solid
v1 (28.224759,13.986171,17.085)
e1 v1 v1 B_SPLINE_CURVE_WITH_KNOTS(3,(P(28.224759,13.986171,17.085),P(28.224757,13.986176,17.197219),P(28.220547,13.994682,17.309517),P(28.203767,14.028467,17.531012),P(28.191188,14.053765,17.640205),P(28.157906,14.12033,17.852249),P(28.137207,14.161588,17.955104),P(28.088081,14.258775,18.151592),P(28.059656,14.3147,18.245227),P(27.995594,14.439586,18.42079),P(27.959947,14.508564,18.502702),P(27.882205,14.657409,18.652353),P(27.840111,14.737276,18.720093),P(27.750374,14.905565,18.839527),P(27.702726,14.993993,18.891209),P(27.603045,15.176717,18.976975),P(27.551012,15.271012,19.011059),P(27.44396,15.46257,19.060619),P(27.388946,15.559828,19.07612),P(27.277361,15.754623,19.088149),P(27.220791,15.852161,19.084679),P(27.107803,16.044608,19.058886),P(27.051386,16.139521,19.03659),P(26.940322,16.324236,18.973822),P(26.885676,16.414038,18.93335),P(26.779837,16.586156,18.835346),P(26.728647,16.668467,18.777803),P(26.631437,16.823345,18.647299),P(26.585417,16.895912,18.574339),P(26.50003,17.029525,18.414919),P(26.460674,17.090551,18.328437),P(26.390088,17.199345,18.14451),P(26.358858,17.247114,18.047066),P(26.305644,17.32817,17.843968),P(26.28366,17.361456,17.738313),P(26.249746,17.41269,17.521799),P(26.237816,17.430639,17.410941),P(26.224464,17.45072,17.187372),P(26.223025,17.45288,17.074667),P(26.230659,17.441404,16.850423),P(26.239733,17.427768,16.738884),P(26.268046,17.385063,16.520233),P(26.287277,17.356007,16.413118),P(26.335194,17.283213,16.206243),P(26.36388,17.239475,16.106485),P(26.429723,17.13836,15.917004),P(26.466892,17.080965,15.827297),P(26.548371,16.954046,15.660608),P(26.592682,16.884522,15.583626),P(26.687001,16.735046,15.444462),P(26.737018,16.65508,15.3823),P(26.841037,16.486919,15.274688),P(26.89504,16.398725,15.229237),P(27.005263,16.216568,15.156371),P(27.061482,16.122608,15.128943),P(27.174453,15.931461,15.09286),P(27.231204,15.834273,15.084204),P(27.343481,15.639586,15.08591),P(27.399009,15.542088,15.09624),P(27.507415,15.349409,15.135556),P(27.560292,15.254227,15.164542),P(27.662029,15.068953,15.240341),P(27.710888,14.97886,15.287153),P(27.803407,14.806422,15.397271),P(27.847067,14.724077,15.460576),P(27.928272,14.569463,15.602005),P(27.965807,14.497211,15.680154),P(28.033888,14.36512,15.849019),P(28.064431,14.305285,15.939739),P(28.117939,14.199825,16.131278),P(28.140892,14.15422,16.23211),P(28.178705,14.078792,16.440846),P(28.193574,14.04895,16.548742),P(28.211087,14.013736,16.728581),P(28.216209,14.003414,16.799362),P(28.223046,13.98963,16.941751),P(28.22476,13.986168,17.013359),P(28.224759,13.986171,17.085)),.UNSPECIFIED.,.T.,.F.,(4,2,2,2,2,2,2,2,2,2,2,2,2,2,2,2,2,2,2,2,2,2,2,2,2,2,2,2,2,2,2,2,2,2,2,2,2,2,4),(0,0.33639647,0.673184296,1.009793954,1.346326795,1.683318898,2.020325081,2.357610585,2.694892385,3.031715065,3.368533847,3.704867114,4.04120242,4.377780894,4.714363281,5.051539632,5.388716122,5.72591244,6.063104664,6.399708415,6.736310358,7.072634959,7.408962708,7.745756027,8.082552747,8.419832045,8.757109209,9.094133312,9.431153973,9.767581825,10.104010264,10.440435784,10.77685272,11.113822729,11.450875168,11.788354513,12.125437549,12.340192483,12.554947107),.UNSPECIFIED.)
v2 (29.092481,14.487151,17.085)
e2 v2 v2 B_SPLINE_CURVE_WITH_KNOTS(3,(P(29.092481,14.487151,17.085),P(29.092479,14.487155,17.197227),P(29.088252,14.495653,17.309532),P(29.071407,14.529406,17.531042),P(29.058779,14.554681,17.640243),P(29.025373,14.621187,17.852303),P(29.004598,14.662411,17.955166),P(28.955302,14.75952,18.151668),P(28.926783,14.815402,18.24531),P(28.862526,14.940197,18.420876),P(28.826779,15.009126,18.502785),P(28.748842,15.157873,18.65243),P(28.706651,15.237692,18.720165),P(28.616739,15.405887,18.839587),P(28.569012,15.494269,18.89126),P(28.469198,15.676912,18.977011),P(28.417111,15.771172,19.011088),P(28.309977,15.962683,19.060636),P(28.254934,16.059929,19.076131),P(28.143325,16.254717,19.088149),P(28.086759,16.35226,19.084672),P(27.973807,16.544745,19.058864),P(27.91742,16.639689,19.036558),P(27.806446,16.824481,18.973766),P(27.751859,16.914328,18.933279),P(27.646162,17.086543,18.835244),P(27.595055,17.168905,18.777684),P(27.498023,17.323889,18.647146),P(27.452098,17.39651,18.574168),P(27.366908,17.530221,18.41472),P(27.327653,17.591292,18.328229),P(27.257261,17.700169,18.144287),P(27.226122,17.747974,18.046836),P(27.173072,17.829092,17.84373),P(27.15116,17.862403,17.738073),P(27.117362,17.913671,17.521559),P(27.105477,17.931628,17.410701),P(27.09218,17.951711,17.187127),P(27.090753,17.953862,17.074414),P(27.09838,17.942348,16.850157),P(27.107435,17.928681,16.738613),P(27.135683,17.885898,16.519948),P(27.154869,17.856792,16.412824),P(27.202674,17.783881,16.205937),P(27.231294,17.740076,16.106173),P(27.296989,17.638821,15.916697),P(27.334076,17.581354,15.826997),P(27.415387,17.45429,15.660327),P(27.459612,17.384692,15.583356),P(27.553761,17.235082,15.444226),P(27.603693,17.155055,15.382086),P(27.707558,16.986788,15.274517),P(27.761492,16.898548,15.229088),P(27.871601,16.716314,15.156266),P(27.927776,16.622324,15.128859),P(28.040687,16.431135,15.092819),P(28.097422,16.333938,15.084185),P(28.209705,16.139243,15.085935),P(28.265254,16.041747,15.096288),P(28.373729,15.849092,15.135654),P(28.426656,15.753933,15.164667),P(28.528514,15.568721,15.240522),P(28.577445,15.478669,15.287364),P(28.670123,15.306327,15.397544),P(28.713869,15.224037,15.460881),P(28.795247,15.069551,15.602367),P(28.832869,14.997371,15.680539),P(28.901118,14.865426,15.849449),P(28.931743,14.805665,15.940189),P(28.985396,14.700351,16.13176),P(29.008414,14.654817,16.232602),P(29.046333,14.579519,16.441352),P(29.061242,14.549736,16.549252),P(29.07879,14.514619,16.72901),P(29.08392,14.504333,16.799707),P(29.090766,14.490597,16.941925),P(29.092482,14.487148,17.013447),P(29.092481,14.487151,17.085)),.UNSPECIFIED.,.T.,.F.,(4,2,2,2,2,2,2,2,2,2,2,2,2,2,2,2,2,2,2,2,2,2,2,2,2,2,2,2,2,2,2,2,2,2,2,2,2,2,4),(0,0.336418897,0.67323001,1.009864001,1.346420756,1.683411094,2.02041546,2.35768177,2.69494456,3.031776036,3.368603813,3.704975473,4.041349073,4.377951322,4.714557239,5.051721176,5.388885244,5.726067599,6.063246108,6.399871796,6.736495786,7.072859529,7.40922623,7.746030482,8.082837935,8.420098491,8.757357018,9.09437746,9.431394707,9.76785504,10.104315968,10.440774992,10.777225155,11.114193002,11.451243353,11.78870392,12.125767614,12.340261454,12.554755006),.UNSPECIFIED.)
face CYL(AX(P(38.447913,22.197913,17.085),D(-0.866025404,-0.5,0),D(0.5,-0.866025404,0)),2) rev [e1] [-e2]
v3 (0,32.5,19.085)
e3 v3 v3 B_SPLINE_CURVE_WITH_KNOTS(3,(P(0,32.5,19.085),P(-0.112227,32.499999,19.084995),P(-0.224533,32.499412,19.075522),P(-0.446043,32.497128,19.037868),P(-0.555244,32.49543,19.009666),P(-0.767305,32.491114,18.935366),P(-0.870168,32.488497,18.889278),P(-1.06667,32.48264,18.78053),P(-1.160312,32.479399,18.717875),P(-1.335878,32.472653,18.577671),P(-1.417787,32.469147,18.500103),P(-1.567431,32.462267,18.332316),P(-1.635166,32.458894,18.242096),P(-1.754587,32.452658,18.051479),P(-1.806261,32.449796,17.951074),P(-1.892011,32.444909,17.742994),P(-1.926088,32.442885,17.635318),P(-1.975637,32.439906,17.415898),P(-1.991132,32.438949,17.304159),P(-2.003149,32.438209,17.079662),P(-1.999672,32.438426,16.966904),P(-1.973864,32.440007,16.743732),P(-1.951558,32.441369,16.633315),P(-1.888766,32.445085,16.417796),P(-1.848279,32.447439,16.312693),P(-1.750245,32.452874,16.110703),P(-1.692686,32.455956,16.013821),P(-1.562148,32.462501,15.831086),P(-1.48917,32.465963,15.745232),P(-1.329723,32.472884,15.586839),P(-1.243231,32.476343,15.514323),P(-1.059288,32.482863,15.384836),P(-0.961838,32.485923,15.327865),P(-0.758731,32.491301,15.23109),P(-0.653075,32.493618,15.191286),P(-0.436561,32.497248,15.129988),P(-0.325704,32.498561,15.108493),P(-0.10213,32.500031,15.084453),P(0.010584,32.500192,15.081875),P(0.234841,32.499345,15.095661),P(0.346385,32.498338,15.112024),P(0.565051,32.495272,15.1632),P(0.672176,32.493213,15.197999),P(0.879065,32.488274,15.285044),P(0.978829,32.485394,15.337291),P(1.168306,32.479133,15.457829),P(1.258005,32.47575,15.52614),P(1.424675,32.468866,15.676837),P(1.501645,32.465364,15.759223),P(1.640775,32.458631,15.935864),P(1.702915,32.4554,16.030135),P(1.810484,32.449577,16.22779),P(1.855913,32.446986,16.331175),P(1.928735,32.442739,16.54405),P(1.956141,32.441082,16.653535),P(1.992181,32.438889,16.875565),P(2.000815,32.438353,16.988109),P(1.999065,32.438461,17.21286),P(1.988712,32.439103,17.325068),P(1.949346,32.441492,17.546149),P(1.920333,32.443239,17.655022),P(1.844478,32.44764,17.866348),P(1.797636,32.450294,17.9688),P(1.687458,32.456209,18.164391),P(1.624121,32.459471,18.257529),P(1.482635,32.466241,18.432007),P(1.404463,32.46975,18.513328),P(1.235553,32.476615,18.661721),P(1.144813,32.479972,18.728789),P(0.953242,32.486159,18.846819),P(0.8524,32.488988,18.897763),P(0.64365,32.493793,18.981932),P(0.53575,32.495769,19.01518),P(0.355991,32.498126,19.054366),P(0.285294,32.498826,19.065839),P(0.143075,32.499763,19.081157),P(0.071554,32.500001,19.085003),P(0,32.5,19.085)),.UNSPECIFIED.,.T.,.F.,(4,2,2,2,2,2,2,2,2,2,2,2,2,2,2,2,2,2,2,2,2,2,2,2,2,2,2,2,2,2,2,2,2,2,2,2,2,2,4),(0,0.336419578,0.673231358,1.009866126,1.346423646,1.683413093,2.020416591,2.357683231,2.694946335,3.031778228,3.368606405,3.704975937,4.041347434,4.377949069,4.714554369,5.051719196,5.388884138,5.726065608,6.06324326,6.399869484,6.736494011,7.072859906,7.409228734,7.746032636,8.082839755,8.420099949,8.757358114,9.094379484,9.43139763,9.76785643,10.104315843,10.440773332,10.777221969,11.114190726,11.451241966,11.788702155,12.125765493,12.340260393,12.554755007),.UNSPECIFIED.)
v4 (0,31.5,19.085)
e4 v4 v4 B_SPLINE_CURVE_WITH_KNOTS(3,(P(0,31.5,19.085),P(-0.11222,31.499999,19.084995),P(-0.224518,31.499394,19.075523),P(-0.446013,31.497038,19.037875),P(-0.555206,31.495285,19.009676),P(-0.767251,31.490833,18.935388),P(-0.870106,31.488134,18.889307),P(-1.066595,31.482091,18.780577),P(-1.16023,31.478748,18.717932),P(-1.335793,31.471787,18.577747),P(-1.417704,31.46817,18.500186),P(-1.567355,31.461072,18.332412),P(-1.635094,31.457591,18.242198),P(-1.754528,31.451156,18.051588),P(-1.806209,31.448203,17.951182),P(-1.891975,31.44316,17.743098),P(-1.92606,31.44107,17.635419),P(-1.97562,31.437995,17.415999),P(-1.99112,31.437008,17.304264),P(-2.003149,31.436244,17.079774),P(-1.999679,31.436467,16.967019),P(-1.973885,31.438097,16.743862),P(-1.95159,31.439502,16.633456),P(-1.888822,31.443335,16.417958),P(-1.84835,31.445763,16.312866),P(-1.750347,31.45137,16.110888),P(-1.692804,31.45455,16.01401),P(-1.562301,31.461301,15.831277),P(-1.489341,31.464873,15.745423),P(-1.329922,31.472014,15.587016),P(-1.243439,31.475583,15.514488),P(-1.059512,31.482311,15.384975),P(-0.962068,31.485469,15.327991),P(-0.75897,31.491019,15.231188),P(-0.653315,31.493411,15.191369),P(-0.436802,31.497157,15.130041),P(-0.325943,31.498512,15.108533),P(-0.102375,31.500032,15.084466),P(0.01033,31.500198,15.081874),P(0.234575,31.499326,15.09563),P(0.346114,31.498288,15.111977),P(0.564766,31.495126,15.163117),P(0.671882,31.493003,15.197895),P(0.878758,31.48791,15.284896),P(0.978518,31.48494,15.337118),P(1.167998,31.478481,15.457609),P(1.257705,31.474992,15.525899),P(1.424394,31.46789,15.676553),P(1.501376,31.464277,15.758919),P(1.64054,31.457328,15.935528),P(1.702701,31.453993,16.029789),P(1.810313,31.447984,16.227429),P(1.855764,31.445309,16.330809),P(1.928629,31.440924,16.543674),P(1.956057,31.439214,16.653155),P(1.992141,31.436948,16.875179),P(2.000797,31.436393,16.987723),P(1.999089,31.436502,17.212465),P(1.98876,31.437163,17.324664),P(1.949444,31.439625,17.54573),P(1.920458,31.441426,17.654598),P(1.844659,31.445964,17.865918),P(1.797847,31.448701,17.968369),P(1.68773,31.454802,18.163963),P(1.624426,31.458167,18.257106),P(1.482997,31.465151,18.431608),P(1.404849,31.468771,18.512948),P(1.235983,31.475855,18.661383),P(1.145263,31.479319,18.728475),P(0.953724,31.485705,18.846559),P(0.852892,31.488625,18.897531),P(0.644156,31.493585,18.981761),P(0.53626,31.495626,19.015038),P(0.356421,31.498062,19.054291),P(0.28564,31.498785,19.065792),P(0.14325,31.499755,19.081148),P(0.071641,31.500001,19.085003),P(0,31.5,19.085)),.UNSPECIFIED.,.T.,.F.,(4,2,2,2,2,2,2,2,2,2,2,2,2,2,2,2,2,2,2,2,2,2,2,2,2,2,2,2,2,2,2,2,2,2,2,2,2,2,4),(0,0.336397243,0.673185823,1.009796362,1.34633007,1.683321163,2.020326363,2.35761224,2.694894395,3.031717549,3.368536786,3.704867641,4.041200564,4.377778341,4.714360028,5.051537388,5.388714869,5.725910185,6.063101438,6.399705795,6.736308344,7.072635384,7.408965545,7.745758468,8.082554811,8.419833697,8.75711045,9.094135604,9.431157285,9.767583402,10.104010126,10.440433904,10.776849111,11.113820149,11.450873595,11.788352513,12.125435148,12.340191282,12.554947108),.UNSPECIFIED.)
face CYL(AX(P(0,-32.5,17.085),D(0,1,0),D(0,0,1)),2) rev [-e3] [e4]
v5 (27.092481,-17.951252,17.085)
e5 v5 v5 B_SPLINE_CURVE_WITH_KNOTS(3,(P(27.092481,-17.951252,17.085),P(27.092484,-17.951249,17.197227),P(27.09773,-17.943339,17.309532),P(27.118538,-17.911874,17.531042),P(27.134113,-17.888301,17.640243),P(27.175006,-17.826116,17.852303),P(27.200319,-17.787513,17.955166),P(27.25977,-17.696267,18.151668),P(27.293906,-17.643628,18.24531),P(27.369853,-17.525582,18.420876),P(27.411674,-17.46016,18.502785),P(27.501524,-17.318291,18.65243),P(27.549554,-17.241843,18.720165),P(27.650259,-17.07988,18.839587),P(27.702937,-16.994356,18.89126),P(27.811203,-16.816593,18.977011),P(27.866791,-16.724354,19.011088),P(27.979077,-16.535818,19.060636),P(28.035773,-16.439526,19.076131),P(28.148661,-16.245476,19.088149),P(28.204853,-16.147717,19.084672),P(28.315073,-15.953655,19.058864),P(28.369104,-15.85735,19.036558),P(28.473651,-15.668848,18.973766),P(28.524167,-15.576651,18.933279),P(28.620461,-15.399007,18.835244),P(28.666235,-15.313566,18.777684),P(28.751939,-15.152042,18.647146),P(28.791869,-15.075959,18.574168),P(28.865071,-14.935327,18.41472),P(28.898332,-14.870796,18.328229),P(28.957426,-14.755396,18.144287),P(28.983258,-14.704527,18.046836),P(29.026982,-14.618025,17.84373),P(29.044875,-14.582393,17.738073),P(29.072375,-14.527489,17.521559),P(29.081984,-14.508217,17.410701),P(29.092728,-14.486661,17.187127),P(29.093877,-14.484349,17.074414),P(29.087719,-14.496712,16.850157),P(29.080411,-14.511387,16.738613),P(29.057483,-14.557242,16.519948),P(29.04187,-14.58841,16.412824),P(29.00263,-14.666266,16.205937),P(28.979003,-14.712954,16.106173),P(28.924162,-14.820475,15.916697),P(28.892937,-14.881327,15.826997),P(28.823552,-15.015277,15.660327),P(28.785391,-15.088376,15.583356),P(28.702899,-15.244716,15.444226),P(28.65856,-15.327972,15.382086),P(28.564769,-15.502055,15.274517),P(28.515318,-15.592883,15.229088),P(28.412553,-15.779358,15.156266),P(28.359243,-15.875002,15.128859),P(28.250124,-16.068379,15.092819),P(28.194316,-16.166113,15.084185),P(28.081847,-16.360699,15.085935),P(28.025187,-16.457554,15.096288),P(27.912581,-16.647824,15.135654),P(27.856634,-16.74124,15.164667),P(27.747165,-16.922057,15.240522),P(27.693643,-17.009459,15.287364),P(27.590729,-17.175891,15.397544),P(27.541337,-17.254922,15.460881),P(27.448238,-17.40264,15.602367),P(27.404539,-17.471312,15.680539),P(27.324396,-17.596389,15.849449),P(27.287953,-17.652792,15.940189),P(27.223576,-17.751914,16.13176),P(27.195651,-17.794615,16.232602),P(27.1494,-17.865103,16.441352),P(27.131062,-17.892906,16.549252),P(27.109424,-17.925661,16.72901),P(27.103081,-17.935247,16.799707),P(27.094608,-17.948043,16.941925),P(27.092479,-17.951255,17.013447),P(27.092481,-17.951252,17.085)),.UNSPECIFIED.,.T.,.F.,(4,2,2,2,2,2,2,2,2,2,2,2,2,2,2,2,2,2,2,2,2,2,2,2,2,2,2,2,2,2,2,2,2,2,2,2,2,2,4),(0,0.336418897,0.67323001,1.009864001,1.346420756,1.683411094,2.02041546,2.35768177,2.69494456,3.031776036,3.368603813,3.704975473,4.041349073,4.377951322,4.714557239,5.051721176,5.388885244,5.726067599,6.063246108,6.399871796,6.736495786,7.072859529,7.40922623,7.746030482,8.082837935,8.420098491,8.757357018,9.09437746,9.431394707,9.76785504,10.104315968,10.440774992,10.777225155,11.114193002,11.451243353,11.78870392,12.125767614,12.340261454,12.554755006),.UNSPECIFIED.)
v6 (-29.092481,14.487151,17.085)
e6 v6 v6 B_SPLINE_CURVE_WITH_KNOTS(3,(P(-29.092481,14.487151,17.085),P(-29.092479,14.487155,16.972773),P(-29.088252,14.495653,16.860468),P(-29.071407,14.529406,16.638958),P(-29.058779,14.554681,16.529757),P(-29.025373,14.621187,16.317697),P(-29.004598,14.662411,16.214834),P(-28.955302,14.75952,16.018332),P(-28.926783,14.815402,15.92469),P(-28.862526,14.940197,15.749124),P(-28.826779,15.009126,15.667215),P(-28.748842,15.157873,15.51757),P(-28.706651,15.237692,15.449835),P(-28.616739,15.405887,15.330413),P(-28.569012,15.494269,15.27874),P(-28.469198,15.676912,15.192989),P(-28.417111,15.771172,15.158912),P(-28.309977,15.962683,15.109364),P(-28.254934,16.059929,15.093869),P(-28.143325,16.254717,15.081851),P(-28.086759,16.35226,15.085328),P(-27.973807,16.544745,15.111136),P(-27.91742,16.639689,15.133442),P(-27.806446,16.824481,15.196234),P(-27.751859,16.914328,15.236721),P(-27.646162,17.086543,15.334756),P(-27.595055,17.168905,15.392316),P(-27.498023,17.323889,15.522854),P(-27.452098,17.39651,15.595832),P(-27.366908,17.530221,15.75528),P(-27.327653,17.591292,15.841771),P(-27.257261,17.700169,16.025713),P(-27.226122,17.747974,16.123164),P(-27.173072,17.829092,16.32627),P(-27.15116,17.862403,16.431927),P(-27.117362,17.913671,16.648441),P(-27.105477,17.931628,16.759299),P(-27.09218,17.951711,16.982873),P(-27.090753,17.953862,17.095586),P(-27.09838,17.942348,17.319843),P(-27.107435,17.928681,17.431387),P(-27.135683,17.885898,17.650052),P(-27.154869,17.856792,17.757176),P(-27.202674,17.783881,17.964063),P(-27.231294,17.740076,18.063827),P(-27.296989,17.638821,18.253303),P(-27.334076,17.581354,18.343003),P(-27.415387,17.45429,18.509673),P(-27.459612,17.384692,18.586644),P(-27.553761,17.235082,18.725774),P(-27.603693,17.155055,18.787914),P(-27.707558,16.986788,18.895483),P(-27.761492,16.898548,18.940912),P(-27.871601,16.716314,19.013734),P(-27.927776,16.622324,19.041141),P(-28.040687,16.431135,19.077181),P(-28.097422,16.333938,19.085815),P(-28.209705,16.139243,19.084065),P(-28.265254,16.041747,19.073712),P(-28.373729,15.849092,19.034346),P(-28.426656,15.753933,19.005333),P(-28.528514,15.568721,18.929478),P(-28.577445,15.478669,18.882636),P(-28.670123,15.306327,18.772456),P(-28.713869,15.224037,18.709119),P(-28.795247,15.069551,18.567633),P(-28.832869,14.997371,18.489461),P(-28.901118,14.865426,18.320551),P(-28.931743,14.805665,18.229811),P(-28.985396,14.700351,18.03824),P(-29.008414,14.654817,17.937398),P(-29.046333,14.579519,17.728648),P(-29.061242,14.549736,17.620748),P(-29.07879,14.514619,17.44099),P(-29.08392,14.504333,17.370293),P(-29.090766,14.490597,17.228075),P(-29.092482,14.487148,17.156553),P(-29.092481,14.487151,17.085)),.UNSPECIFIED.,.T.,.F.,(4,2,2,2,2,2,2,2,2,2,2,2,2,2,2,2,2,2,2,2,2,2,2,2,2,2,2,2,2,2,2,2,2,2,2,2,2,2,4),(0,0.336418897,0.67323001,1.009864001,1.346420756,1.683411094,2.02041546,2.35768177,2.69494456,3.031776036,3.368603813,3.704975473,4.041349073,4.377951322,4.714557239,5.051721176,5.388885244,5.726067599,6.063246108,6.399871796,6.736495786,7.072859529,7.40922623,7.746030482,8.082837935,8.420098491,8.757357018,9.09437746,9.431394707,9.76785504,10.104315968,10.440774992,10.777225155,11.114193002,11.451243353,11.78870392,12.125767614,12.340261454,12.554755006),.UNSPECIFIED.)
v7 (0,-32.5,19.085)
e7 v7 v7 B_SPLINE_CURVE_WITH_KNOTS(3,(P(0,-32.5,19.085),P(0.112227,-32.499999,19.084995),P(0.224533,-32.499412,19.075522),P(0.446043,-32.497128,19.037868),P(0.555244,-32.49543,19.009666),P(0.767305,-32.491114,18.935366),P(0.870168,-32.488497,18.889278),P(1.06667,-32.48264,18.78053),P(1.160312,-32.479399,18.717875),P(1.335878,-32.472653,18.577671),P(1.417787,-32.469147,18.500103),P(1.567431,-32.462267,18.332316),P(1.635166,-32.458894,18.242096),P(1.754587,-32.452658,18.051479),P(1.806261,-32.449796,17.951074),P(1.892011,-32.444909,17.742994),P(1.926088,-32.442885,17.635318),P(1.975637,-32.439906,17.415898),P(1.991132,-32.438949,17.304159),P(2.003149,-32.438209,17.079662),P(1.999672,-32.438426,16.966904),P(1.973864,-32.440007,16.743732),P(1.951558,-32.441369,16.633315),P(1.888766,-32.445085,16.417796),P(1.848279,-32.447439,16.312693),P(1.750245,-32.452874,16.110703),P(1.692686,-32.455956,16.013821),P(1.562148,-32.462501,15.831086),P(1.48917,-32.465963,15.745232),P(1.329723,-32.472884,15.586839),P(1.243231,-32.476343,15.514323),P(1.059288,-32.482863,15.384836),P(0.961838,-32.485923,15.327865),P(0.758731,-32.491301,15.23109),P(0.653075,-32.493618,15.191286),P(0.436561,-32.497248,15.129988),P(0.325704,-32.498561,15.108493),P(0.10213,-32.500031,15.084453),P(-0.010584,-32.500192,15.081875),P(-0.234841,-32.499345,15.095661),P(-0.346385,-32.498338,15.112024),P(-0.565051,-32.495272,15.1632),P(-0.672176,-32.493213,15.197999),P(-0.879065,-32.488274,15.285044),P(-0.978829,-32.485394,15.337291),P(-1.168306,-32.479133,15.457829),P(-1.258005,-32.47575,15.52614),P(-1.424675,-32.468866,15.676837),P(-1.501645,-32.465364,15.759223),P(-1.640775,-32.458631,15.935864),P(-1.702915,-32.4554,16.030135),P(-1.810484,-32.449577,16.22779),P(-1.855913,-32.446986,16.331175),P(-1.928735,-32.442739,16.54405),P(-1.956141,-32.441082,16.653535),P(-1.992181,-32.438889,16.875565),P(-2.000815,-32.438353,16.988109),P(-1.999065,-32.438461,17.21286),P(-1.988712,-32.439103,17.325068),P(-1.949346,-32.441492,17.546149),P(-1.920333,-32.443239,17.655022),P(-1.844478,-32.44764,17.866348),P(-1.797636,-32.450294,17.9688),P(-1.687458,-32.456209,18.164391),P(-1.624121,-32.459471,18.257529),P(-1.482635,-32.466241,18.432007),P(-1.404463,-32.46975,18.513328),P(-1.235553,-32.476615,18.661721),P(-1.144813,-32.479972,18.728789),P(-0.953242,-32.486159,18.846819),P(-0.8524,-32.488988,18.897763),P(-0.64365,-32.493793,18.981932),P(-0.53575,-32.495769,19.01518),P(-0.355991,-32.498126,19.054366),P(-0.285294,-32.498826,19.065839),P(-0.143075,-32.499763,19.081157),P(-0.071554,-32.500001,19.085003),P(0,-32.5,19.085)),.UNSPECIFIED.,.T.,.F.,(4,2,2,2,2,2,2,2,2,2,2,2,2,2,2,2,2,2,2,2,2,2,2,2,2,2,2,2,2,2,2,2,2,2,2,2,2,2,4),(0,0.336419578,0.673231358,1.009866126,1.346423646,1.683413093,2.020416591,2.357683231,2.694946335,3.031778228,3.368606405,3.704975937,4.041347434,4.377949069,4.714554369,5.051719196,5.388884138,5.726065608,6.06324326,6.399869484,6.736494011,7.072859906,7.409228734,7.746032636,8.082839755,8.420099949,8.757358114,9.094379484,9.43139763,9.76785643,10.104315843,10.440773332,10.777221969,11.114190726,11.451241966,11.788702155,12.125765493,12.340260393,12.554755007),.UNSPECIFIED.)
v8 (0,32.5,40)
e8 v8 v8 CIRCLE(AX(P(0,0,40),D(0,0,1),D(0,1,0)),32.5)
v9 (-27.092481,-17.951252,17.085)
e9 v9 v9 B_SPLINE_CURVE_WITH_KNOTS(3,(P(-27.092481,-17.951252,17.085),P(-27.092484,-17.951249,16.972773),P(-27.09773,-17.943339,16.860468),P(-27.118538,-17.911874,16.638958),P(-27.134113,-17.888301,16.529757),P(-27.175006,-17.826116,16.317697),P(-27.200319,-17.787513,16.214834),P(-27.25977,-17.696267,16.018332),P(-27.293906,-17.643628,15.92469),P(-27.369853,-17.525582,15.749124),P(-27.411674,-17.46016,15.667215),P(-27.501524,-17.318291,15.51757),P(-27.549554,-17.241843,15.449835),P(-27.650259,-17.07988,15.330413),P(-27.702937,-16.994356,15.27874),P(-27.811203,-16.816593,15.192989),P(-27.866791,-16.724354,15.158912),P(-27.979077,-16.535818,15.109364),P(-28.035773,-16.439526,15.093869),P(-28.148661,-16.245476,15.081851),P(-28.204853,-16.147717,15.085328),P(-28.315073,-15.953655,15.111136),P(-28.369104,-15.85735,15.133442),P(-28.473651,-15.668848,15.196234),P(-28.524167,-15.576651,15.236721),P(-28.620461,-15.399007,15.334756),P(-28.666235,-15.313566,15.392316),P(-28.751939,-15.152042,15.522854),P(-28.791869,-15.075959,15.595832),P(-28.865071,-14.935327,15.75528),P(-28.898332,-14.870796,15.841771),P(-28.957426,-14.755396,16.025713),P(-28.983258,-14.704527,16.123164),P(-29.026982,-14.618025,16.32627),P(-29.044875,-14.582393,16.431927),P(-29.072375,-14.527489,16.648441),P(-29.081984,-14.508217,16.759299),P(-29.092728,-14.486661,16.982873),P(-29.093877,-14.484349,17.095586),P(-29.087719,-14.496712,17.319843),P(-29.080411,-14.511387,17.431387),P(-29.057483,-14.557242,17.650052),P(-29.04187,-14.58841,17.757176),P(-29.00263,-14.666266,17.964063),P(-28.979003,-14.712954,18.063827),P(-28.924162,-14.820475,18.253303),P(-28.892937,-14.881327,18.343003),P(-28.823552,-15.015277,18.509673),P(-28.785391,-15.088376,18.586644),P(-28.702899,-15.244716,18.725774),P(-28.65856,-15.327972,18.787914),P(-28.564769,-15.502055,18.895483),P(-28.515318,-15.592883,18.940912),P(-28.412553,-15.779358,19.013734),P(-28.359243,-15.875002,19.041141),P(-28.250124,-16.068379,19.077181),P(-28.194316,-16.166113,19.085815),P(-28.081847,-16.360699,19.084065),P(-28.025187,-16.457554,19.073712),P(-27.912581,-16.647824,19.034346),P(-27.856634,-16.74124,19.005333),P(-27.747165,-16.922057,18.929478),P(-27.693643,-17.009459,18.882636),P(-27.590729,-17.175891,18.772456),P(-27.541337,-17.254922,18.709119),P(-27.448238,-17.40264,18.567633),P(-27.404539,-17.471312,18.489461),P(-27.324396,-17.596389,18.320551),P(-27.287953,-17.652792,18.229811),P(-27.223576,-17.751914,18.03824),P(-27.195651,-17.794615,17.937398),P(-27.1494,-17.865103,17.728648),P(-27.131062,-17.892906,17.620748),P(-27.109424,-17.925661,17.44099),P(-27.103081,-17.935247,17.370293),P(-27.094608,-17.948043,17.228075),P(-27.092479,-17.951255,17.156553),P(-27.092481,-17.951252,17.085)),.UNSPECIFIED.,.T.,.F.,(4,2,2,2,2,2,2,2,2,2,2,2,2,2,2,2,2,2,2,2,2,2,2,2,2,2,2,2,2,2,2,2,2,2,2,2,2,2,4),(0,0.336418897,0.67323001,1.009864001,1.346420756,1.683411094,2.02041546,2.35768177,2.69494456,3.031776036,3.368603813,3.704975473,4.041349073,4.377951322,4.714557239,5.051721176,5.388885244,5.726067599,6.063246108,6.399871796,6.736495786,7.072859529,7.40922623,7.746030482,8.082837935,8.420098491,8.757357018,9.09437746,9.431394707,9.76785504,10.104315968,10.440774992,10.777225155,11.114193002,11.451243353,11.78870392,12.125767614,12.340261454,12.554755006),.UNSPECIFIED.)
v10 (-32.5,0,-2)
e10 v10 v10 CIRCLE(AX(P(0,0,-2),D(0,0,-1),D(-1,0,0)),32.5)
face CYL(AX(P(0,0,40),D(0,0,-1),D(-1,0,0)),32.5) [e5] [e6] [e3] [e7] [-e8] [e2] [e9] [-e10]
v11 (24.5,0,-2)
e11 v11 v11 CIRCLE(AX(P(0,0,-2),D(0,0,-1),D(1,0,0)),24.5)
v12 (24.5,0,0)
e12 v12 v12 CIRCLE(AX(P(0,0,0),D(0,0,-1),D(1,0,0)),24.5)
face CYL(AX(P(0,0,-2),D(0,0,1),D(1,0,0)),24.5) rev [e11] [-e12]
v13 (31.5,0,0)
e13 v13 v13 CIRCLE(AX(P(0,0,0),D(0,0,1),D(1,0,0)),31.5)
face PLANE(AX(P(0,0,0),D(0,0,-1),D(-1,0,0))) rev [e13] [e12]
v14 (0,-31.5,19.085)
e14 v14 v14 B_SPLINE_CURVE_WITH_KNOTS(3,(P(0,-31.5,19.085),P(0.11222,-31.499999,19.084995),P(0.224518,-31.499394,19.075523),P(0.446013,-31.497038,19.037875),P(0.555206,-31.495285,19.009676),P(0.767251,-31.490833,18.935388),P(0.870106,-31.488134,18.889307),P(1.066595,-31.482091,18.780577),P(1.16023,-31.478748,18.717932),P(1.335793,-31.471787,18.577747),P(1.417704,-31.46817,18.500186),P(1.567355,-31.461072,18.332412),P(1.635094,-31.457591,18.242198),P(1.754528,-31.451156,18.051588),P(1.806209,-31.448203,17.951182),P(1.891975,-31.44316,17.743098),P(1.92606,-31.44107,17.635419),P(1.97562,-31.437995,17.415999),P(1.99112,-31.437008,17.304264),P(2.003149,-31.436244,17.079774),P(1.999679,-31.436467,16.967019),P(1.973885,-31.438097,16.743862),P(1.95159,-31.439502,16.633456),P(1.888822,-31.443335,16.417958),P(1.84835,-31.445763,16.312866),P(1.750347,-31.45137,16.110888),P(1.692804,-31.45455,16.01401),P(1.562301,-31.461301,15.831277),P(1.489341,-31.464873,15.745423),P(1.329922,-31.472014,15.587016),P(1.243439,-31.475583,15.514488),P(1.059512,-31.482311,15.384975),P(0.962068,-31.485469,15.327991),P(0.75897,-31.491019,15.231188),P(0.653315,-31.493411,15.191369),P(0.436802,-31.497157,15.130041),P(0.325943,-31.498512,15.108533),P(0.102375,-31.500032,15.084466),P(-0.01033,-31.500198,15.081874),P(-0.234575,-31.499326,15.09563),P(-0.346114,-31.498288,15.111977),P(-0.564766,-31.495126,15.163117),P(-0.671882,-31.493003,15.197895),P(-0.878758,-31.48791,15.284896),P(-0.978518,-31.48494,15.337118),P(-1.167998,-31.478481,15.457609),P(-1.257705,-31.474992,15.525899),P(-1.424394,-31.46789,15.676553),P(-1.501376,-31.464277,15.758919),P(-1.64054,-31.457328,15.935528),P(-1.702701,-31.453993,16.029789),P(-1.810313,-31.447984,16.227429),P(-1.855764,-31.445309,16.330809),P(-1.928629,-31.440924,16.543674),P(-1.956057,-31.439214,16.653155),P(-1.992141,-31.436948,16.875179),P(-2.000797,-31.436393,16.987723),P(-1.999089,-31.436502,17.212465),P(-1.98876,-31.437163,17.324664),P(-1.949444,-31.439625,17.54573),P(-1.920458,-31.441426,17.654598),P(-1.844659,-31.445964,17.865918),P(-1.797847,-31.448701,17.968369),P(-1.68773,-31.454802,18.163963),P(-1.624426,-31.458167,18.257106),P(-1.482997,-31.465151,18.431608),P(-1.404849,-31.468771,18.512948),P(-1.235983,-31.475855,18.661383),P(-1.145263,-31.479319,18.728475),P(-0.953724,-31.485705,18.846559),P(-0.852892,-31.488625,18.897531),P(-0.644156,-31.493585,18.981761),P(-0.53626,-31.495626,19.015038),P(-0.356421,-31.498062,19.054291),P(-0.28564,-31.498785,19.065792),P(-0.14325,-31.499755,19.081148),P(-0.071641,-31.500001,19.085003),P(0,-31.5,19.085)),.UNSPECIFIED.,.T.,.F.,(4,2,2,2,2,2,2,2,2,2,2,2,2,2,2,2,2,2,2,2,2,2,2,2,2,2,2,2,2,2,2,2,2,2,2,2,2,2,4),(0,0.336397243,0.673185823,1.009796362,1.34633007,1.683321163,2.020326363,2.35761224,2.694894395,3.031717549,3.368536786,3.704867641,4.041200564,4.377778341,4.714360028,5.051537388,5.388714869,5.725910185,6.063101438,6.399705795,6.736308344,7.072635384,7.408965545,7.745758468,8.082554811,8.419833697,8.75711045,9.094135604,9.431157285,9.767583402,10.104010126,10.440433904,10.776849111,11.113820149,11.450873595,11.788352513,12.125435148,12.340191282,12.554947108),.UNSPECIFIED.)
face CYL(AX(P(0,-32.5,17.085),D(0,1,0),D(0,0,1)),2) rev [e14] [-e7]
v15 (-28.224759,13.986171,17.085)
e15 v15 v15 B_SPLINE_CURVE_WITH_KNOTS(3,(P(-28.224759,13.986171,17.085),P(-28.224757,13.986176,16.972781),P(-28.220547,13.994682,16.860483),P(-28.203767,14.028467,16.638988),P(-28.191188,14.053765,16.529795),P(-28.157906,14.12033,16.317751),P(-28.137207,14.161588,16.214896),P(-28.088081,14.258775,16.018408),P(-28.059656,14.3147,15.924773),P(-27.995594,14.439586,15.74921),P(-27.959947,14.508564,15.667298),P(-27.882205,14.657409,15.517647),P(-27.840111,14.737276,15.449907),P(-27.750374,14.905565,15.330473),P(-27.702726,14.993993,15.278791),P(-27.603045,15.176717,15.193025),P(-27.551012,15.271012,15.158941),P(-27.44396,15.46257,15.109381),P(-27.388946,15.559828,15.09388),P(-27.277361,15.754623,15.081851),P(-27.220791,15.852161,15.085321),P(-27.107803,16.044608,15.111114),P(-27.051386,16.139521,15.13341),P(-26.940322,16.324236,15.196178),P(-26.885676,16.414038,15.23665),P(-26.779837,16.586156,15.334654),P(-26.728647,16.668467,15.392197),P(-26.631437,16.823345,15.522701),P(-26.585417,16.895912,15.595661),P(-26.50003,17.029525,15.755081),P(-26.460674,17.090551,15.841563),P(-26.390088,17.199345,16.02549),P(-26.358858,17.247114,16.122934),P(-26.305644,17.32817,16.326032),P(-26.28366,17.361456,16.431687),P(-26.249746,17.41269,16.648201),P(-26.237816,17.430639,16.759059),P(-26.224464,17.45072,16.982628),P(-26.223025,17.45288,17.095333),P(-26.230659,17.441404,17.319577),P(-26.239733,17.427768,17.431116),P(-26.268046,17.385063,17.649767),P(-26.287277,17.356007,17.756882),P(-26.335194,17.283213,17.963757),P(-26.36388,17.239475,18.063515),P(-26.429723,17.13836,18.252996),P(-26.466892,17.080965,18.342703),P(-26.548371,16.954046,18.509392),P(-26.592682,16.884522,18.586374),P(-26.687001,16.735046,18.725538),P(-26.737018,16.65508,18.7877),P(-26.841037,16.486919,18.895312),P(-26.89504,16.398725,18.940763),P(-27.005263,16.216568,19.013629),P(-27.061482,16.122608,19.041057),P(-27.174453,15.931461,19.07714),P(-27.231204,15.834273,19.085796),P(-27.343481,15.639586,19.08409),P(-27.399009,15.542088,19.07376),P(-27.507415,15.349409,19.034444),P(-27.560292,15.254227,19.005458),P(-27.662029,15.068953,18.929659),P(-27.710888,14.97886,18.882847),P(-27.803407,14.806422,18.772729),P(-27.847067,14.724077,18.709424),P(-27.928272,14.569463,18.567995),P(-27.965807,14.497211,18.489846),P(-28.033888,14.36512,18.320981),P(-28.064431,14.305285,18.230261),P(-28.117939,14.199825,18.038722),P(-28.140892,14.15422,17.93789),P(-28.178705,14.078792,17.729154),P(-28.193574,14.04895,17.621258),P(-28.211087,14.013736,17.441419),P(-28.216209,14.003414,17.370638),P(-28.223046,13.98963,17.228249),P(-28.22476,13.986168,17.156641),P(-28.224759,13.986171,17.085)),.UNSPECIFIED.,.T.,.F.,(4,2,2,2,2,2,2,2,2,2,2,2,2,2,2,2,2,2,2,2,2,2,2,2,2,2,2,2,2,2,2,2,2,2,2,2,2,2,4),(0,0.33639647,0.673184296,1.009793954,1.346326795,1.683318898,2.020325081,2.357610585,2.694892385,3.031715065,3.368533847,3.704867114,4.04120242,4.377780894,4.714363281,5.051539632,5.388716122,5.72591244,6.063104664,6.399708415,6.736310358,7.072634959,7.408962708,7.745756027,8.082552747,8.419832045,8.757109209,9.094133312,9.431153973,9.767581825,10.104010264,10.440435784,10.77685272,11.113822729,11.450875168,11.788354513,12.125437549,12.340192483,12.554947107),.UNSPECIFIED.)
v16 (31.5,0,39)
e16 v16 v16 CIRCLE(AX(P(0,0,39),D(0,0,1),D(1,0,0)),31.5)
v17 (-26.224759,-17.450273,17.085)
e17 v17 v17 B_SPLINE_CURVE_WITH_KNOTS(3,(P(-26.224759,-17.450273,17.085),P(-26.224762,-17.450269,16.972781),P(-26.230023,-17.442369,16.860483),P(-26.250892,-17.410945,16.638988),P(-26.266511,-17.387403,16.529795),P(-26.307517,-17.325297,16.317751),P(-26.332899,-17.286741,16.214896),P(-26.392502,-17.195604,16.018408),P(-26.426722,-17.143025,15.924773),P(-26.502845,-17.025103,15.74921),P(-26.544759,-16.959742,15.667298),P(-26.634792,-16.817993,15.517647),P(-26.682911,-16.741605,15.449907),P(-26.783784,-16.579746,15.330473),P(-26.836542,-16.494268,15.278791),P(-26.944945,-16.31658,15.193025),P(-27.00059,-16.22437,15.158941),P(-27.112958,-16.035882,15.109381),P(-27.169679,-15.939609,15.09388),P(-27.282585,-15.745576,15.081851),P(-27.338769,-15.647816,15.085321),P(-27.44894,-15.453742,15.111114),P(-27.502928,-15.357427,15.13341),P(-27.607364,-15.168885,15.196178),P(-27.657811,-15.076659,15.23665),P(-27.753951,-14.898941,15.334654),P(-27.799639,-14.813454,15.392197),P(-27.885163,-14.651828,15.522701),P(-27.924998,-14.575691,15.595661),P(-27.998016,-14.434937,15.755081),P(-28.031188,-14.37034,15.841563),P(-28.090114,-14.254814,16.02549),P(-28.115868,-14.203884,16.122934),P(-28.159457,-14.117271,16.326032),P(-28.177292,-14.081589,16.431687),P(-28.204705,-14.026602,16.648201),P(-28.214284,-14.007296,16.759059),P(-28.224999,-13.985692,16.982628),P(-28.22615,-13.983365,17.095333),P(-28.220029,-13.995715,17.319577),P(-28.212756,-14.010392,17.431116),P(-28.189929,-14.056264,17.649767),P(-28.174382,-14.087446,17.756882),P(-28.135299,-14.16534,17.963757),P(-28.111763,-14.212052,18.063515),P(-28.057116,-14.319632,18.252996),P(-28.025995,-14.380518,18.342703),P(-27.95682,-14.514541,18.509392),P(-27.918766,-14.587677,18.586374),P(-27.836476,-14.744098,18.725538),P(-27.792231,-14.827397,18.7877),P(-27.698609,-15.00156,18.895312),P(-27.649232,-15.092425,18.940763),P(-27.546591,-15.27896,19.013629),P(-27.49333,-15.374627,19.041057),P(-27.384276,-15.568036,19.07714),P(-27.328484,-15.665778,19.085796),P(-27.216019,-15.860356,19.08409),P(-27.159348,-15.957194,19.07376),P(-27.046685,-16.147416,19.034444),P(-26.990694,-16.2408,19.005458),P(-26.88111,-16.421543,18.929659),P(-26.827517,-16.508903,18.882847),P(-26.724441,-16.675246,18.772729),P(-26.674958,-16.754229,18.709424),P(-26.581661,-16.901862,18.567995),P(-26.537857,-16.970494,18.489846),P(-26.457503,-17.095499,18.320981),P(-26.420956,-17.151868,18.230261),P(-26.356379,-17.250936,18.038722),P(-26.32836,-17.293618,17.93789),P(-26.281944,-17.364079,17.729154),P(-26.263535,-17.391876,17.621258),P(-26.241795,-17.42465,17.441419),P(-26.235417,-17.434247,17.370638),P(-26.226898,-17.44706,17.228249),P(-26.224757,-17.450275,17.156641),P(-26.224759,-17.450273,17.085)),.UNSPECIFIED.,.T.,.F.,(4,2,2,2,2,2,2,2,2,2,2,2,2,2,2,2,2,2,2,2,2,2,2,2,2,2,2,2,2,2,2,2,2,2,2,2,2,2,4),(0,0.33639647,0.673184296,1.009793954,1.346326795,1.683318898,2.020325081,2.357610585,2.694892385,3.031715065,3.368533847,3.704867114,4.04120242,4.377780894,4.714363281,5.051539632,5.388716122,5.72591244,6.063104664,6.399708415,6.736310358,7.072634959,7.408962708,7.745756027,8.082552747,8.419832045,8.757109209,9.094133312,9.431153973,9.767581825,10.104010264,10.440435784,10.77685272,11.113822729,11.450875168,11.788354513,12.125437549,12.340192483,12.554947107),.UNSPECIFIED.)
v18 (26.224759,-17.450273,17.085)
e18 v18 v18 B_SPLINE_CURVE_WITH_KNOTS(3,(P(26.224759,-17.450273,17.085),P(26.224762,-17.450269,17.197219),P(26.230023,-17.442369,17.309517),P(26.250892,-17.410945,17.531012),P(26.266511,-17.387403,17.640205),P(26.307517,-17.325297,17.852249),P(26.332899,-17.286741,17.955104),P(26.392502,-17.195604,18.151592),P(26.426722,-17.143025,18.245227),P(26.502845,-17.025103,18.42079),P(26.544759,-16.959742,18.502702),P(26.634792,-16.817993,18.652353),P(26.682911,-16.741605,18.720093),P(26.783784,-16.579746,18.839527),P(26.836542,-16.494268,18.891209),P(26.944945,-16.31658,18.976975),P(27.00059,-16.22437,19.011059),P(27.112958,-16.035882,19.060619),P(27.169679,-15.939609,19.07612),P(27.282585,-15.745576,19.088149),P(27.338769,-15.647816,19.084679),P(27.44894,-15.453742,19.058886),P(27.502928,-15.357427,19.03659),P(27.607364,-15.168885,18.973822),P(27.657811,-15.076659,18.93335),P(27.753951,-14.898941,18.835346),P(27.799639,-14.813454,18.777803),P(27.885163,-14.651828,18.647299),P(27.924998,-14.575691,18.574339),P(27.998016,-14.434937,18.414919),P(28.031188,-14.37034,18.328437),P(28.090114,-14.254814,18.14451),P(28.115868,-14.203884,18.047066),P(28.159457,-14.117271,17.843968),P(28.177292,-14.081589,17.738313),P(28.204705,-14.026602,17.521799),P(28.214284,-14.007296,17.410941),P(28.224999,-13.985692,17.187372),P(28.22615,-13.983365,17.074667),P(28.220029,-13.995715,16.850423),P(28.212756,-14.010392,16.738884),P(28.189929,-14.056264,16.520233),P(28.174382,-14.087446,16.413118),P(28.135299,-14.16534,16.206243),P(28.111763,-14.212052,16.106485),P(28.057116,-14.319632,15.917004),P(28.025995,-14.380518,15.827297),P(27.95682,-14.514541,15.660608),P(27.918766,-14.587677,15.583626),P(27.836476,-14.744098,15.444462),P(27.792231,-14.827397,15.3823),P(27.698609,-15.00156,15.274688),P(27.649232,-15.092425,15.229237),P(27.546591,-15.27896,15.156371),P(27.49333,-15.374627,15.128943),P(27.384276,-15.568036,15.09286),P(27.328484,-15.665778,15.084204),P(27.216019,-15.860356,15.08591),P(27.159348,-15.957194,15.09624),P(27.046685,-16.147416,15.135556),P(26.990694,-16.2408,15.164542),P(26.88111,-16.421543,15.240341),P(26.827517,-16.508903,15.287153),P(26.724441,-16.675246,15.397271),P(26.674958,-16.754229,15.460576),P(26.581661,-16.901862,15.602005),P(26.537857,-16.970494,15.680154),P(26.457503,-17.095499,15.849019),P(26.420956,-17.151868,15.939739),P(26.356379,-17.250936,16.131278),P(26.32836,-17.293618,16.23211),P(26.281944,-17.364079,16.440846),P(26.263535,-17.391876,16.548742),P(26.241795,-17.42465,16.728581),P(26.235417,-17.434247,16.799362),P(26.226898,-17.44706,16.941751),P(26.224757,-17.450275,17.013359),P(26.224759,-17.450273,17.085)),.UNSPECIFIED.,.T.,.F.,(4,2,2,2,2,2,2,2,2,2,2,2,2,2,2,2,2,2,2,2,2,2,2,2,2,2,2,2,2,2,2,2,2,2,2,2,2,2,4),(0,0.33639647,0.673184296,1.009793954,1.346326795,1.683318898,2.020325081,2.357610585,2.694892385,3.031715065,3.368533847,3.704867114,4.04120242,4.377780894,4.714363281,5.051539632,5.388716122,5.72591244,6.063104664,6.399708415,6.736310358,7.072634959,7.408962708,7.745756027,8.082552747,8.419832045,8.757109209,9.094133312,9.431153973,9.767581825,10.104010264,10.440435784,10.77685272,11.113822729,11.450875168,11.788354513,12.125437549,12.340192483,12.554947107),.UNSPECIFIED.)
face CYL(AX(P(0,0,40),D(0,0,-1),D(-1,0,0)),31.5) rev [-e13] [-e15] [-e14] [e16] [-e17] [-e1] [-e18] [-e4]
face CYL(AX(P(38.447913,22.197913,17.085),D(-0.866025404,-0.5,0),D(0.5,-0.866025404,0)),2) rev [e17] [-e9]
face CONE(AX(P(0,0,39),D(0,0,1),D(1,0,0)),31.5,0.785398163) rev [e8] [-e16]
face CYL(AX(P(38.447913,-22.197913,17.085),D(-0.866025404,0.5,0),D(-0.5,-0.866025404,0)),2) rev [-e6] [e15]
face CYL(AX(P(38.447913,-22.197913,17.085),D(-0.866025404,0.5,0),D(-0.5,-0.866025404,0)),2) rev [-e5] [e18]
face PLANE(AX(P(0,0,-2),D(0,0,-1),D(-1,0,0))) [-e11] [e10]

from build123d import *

# Parameters (mm, degrees)
SKETCH1_R               = 32.5
SKETCH1_R_2             = 31.5
EXTRUDE_THIN1_DEPTH     = 40
SKETCH2_R               = 2
CUT_EXTRUDE1_DEPTH      = 61.930288035
CIRPATTERN1_START       = -32.500000066
CIRPATTERN1_OUTLINE_R   = 2
CIRPATTERN1_DEPTH       = 65.000000132
CIRPATTERN1_2_OUTLINE_R = 2
CIRPATTERN1_2_DEPTH     = 65.000000132
EXTRUDE_THIN2_START     = 2
SKETCH3_R               = 32.5
SKETCH3_R_2             = 24.5
EXTRUDE_THIN2_DEPTH     = 2
CHAMFER1_SIZE           = 1


# Read off the part's stored shape, not the designer's step: CirPattern1
with BuildPart() as part:
    # Sketch1 → Extrude-Thin1 (new body)
    with BuildSketch(Plane(origin=(0, 0, 0), x_dir=(0, 1, 0), z_dir=(0, 0, 1))):
        Circle(SKETCH1_R)
        Circle(SKETCH1_R_2, mode=Mode.SUBTRACT)
    extrude(amount=EXTRUDE_THIN1_DEPTH)

    # Sketch2 → Cut-Extrude1 (cut, symmetric)
    with BuildSketch(Plane(origin=(0, 0, 0), x_dir=(-1, 0, 0), z_dir=(0, 1, 0))):
        with Locations(Location((0, 17.085, 0), (0, 0, 90))):
            Circle(SKETCH2_R)
    extrude(amount=CUT_EXTRUDE1_DEPTH, both=True, mode=Mode.SUBTRACT)

    # CirPattern1 outline → CirPattern1 (cut)
    with BuildSketch(Plane(origin=(0, 0, 0), x_dir=(0.500000000000004, -0.8660254037844363, 0), z_dir=(0.8660254037844363, 0.5000000000000042, 0)).offset(CIRPATTERN1_START)):
        with Locations((0, -17.085)):
            Circle(CIRPATTERN1_OUTLINE_R)
    extrude(amount=CIRPATTERN1_DEPTH, mode=Mode.SUBTRACT)

    # CirPattern1 2 outline → CirPattern1 2 (cut)
    with BuildSketch(Plane(origin=(0, 0, 0), x_dir=(0.49999999999999767, 0.86602540378444, 0), z_dir=(0.8660254037844399, -0.49999999999999795, 0)).offset(CIRPATTERN1_START)):
        with Locations((0, 17.085)):
            Circle(CIRPATTERN1_2_OUTLINE_R)
    extrude(amount=CIRPATTERN1_2_DEPTH, mode=Mode.SUBTRACT)

    # Sketch3 → Extrude-Thin2 (add)
    with BuildSketch(Plane(origin=(0, 0, 0), x_dir=(1, 0, 0), z_dir=(0, 0, -1)).offset(EXTRUDE_THIN2_START)):
        Circle(SKETCH3_R)
        Circle(SKETCH3_R_2, mode=Mode.SUBTRACT)
    extrude(amount=-EXTRUDE_THIN2_DEPTH)

    # Chamfer1
    chamfer1_edges = [part.edges().sort_by_distance(p)[0] for p in [
        (0, -31.5, 40),
    ]]
    chamfer(chamfer1_edges, length=CHAMFER1_SIZE - 0.0001)  # a hair under: the kernel refuses the full size


solid = part.part
